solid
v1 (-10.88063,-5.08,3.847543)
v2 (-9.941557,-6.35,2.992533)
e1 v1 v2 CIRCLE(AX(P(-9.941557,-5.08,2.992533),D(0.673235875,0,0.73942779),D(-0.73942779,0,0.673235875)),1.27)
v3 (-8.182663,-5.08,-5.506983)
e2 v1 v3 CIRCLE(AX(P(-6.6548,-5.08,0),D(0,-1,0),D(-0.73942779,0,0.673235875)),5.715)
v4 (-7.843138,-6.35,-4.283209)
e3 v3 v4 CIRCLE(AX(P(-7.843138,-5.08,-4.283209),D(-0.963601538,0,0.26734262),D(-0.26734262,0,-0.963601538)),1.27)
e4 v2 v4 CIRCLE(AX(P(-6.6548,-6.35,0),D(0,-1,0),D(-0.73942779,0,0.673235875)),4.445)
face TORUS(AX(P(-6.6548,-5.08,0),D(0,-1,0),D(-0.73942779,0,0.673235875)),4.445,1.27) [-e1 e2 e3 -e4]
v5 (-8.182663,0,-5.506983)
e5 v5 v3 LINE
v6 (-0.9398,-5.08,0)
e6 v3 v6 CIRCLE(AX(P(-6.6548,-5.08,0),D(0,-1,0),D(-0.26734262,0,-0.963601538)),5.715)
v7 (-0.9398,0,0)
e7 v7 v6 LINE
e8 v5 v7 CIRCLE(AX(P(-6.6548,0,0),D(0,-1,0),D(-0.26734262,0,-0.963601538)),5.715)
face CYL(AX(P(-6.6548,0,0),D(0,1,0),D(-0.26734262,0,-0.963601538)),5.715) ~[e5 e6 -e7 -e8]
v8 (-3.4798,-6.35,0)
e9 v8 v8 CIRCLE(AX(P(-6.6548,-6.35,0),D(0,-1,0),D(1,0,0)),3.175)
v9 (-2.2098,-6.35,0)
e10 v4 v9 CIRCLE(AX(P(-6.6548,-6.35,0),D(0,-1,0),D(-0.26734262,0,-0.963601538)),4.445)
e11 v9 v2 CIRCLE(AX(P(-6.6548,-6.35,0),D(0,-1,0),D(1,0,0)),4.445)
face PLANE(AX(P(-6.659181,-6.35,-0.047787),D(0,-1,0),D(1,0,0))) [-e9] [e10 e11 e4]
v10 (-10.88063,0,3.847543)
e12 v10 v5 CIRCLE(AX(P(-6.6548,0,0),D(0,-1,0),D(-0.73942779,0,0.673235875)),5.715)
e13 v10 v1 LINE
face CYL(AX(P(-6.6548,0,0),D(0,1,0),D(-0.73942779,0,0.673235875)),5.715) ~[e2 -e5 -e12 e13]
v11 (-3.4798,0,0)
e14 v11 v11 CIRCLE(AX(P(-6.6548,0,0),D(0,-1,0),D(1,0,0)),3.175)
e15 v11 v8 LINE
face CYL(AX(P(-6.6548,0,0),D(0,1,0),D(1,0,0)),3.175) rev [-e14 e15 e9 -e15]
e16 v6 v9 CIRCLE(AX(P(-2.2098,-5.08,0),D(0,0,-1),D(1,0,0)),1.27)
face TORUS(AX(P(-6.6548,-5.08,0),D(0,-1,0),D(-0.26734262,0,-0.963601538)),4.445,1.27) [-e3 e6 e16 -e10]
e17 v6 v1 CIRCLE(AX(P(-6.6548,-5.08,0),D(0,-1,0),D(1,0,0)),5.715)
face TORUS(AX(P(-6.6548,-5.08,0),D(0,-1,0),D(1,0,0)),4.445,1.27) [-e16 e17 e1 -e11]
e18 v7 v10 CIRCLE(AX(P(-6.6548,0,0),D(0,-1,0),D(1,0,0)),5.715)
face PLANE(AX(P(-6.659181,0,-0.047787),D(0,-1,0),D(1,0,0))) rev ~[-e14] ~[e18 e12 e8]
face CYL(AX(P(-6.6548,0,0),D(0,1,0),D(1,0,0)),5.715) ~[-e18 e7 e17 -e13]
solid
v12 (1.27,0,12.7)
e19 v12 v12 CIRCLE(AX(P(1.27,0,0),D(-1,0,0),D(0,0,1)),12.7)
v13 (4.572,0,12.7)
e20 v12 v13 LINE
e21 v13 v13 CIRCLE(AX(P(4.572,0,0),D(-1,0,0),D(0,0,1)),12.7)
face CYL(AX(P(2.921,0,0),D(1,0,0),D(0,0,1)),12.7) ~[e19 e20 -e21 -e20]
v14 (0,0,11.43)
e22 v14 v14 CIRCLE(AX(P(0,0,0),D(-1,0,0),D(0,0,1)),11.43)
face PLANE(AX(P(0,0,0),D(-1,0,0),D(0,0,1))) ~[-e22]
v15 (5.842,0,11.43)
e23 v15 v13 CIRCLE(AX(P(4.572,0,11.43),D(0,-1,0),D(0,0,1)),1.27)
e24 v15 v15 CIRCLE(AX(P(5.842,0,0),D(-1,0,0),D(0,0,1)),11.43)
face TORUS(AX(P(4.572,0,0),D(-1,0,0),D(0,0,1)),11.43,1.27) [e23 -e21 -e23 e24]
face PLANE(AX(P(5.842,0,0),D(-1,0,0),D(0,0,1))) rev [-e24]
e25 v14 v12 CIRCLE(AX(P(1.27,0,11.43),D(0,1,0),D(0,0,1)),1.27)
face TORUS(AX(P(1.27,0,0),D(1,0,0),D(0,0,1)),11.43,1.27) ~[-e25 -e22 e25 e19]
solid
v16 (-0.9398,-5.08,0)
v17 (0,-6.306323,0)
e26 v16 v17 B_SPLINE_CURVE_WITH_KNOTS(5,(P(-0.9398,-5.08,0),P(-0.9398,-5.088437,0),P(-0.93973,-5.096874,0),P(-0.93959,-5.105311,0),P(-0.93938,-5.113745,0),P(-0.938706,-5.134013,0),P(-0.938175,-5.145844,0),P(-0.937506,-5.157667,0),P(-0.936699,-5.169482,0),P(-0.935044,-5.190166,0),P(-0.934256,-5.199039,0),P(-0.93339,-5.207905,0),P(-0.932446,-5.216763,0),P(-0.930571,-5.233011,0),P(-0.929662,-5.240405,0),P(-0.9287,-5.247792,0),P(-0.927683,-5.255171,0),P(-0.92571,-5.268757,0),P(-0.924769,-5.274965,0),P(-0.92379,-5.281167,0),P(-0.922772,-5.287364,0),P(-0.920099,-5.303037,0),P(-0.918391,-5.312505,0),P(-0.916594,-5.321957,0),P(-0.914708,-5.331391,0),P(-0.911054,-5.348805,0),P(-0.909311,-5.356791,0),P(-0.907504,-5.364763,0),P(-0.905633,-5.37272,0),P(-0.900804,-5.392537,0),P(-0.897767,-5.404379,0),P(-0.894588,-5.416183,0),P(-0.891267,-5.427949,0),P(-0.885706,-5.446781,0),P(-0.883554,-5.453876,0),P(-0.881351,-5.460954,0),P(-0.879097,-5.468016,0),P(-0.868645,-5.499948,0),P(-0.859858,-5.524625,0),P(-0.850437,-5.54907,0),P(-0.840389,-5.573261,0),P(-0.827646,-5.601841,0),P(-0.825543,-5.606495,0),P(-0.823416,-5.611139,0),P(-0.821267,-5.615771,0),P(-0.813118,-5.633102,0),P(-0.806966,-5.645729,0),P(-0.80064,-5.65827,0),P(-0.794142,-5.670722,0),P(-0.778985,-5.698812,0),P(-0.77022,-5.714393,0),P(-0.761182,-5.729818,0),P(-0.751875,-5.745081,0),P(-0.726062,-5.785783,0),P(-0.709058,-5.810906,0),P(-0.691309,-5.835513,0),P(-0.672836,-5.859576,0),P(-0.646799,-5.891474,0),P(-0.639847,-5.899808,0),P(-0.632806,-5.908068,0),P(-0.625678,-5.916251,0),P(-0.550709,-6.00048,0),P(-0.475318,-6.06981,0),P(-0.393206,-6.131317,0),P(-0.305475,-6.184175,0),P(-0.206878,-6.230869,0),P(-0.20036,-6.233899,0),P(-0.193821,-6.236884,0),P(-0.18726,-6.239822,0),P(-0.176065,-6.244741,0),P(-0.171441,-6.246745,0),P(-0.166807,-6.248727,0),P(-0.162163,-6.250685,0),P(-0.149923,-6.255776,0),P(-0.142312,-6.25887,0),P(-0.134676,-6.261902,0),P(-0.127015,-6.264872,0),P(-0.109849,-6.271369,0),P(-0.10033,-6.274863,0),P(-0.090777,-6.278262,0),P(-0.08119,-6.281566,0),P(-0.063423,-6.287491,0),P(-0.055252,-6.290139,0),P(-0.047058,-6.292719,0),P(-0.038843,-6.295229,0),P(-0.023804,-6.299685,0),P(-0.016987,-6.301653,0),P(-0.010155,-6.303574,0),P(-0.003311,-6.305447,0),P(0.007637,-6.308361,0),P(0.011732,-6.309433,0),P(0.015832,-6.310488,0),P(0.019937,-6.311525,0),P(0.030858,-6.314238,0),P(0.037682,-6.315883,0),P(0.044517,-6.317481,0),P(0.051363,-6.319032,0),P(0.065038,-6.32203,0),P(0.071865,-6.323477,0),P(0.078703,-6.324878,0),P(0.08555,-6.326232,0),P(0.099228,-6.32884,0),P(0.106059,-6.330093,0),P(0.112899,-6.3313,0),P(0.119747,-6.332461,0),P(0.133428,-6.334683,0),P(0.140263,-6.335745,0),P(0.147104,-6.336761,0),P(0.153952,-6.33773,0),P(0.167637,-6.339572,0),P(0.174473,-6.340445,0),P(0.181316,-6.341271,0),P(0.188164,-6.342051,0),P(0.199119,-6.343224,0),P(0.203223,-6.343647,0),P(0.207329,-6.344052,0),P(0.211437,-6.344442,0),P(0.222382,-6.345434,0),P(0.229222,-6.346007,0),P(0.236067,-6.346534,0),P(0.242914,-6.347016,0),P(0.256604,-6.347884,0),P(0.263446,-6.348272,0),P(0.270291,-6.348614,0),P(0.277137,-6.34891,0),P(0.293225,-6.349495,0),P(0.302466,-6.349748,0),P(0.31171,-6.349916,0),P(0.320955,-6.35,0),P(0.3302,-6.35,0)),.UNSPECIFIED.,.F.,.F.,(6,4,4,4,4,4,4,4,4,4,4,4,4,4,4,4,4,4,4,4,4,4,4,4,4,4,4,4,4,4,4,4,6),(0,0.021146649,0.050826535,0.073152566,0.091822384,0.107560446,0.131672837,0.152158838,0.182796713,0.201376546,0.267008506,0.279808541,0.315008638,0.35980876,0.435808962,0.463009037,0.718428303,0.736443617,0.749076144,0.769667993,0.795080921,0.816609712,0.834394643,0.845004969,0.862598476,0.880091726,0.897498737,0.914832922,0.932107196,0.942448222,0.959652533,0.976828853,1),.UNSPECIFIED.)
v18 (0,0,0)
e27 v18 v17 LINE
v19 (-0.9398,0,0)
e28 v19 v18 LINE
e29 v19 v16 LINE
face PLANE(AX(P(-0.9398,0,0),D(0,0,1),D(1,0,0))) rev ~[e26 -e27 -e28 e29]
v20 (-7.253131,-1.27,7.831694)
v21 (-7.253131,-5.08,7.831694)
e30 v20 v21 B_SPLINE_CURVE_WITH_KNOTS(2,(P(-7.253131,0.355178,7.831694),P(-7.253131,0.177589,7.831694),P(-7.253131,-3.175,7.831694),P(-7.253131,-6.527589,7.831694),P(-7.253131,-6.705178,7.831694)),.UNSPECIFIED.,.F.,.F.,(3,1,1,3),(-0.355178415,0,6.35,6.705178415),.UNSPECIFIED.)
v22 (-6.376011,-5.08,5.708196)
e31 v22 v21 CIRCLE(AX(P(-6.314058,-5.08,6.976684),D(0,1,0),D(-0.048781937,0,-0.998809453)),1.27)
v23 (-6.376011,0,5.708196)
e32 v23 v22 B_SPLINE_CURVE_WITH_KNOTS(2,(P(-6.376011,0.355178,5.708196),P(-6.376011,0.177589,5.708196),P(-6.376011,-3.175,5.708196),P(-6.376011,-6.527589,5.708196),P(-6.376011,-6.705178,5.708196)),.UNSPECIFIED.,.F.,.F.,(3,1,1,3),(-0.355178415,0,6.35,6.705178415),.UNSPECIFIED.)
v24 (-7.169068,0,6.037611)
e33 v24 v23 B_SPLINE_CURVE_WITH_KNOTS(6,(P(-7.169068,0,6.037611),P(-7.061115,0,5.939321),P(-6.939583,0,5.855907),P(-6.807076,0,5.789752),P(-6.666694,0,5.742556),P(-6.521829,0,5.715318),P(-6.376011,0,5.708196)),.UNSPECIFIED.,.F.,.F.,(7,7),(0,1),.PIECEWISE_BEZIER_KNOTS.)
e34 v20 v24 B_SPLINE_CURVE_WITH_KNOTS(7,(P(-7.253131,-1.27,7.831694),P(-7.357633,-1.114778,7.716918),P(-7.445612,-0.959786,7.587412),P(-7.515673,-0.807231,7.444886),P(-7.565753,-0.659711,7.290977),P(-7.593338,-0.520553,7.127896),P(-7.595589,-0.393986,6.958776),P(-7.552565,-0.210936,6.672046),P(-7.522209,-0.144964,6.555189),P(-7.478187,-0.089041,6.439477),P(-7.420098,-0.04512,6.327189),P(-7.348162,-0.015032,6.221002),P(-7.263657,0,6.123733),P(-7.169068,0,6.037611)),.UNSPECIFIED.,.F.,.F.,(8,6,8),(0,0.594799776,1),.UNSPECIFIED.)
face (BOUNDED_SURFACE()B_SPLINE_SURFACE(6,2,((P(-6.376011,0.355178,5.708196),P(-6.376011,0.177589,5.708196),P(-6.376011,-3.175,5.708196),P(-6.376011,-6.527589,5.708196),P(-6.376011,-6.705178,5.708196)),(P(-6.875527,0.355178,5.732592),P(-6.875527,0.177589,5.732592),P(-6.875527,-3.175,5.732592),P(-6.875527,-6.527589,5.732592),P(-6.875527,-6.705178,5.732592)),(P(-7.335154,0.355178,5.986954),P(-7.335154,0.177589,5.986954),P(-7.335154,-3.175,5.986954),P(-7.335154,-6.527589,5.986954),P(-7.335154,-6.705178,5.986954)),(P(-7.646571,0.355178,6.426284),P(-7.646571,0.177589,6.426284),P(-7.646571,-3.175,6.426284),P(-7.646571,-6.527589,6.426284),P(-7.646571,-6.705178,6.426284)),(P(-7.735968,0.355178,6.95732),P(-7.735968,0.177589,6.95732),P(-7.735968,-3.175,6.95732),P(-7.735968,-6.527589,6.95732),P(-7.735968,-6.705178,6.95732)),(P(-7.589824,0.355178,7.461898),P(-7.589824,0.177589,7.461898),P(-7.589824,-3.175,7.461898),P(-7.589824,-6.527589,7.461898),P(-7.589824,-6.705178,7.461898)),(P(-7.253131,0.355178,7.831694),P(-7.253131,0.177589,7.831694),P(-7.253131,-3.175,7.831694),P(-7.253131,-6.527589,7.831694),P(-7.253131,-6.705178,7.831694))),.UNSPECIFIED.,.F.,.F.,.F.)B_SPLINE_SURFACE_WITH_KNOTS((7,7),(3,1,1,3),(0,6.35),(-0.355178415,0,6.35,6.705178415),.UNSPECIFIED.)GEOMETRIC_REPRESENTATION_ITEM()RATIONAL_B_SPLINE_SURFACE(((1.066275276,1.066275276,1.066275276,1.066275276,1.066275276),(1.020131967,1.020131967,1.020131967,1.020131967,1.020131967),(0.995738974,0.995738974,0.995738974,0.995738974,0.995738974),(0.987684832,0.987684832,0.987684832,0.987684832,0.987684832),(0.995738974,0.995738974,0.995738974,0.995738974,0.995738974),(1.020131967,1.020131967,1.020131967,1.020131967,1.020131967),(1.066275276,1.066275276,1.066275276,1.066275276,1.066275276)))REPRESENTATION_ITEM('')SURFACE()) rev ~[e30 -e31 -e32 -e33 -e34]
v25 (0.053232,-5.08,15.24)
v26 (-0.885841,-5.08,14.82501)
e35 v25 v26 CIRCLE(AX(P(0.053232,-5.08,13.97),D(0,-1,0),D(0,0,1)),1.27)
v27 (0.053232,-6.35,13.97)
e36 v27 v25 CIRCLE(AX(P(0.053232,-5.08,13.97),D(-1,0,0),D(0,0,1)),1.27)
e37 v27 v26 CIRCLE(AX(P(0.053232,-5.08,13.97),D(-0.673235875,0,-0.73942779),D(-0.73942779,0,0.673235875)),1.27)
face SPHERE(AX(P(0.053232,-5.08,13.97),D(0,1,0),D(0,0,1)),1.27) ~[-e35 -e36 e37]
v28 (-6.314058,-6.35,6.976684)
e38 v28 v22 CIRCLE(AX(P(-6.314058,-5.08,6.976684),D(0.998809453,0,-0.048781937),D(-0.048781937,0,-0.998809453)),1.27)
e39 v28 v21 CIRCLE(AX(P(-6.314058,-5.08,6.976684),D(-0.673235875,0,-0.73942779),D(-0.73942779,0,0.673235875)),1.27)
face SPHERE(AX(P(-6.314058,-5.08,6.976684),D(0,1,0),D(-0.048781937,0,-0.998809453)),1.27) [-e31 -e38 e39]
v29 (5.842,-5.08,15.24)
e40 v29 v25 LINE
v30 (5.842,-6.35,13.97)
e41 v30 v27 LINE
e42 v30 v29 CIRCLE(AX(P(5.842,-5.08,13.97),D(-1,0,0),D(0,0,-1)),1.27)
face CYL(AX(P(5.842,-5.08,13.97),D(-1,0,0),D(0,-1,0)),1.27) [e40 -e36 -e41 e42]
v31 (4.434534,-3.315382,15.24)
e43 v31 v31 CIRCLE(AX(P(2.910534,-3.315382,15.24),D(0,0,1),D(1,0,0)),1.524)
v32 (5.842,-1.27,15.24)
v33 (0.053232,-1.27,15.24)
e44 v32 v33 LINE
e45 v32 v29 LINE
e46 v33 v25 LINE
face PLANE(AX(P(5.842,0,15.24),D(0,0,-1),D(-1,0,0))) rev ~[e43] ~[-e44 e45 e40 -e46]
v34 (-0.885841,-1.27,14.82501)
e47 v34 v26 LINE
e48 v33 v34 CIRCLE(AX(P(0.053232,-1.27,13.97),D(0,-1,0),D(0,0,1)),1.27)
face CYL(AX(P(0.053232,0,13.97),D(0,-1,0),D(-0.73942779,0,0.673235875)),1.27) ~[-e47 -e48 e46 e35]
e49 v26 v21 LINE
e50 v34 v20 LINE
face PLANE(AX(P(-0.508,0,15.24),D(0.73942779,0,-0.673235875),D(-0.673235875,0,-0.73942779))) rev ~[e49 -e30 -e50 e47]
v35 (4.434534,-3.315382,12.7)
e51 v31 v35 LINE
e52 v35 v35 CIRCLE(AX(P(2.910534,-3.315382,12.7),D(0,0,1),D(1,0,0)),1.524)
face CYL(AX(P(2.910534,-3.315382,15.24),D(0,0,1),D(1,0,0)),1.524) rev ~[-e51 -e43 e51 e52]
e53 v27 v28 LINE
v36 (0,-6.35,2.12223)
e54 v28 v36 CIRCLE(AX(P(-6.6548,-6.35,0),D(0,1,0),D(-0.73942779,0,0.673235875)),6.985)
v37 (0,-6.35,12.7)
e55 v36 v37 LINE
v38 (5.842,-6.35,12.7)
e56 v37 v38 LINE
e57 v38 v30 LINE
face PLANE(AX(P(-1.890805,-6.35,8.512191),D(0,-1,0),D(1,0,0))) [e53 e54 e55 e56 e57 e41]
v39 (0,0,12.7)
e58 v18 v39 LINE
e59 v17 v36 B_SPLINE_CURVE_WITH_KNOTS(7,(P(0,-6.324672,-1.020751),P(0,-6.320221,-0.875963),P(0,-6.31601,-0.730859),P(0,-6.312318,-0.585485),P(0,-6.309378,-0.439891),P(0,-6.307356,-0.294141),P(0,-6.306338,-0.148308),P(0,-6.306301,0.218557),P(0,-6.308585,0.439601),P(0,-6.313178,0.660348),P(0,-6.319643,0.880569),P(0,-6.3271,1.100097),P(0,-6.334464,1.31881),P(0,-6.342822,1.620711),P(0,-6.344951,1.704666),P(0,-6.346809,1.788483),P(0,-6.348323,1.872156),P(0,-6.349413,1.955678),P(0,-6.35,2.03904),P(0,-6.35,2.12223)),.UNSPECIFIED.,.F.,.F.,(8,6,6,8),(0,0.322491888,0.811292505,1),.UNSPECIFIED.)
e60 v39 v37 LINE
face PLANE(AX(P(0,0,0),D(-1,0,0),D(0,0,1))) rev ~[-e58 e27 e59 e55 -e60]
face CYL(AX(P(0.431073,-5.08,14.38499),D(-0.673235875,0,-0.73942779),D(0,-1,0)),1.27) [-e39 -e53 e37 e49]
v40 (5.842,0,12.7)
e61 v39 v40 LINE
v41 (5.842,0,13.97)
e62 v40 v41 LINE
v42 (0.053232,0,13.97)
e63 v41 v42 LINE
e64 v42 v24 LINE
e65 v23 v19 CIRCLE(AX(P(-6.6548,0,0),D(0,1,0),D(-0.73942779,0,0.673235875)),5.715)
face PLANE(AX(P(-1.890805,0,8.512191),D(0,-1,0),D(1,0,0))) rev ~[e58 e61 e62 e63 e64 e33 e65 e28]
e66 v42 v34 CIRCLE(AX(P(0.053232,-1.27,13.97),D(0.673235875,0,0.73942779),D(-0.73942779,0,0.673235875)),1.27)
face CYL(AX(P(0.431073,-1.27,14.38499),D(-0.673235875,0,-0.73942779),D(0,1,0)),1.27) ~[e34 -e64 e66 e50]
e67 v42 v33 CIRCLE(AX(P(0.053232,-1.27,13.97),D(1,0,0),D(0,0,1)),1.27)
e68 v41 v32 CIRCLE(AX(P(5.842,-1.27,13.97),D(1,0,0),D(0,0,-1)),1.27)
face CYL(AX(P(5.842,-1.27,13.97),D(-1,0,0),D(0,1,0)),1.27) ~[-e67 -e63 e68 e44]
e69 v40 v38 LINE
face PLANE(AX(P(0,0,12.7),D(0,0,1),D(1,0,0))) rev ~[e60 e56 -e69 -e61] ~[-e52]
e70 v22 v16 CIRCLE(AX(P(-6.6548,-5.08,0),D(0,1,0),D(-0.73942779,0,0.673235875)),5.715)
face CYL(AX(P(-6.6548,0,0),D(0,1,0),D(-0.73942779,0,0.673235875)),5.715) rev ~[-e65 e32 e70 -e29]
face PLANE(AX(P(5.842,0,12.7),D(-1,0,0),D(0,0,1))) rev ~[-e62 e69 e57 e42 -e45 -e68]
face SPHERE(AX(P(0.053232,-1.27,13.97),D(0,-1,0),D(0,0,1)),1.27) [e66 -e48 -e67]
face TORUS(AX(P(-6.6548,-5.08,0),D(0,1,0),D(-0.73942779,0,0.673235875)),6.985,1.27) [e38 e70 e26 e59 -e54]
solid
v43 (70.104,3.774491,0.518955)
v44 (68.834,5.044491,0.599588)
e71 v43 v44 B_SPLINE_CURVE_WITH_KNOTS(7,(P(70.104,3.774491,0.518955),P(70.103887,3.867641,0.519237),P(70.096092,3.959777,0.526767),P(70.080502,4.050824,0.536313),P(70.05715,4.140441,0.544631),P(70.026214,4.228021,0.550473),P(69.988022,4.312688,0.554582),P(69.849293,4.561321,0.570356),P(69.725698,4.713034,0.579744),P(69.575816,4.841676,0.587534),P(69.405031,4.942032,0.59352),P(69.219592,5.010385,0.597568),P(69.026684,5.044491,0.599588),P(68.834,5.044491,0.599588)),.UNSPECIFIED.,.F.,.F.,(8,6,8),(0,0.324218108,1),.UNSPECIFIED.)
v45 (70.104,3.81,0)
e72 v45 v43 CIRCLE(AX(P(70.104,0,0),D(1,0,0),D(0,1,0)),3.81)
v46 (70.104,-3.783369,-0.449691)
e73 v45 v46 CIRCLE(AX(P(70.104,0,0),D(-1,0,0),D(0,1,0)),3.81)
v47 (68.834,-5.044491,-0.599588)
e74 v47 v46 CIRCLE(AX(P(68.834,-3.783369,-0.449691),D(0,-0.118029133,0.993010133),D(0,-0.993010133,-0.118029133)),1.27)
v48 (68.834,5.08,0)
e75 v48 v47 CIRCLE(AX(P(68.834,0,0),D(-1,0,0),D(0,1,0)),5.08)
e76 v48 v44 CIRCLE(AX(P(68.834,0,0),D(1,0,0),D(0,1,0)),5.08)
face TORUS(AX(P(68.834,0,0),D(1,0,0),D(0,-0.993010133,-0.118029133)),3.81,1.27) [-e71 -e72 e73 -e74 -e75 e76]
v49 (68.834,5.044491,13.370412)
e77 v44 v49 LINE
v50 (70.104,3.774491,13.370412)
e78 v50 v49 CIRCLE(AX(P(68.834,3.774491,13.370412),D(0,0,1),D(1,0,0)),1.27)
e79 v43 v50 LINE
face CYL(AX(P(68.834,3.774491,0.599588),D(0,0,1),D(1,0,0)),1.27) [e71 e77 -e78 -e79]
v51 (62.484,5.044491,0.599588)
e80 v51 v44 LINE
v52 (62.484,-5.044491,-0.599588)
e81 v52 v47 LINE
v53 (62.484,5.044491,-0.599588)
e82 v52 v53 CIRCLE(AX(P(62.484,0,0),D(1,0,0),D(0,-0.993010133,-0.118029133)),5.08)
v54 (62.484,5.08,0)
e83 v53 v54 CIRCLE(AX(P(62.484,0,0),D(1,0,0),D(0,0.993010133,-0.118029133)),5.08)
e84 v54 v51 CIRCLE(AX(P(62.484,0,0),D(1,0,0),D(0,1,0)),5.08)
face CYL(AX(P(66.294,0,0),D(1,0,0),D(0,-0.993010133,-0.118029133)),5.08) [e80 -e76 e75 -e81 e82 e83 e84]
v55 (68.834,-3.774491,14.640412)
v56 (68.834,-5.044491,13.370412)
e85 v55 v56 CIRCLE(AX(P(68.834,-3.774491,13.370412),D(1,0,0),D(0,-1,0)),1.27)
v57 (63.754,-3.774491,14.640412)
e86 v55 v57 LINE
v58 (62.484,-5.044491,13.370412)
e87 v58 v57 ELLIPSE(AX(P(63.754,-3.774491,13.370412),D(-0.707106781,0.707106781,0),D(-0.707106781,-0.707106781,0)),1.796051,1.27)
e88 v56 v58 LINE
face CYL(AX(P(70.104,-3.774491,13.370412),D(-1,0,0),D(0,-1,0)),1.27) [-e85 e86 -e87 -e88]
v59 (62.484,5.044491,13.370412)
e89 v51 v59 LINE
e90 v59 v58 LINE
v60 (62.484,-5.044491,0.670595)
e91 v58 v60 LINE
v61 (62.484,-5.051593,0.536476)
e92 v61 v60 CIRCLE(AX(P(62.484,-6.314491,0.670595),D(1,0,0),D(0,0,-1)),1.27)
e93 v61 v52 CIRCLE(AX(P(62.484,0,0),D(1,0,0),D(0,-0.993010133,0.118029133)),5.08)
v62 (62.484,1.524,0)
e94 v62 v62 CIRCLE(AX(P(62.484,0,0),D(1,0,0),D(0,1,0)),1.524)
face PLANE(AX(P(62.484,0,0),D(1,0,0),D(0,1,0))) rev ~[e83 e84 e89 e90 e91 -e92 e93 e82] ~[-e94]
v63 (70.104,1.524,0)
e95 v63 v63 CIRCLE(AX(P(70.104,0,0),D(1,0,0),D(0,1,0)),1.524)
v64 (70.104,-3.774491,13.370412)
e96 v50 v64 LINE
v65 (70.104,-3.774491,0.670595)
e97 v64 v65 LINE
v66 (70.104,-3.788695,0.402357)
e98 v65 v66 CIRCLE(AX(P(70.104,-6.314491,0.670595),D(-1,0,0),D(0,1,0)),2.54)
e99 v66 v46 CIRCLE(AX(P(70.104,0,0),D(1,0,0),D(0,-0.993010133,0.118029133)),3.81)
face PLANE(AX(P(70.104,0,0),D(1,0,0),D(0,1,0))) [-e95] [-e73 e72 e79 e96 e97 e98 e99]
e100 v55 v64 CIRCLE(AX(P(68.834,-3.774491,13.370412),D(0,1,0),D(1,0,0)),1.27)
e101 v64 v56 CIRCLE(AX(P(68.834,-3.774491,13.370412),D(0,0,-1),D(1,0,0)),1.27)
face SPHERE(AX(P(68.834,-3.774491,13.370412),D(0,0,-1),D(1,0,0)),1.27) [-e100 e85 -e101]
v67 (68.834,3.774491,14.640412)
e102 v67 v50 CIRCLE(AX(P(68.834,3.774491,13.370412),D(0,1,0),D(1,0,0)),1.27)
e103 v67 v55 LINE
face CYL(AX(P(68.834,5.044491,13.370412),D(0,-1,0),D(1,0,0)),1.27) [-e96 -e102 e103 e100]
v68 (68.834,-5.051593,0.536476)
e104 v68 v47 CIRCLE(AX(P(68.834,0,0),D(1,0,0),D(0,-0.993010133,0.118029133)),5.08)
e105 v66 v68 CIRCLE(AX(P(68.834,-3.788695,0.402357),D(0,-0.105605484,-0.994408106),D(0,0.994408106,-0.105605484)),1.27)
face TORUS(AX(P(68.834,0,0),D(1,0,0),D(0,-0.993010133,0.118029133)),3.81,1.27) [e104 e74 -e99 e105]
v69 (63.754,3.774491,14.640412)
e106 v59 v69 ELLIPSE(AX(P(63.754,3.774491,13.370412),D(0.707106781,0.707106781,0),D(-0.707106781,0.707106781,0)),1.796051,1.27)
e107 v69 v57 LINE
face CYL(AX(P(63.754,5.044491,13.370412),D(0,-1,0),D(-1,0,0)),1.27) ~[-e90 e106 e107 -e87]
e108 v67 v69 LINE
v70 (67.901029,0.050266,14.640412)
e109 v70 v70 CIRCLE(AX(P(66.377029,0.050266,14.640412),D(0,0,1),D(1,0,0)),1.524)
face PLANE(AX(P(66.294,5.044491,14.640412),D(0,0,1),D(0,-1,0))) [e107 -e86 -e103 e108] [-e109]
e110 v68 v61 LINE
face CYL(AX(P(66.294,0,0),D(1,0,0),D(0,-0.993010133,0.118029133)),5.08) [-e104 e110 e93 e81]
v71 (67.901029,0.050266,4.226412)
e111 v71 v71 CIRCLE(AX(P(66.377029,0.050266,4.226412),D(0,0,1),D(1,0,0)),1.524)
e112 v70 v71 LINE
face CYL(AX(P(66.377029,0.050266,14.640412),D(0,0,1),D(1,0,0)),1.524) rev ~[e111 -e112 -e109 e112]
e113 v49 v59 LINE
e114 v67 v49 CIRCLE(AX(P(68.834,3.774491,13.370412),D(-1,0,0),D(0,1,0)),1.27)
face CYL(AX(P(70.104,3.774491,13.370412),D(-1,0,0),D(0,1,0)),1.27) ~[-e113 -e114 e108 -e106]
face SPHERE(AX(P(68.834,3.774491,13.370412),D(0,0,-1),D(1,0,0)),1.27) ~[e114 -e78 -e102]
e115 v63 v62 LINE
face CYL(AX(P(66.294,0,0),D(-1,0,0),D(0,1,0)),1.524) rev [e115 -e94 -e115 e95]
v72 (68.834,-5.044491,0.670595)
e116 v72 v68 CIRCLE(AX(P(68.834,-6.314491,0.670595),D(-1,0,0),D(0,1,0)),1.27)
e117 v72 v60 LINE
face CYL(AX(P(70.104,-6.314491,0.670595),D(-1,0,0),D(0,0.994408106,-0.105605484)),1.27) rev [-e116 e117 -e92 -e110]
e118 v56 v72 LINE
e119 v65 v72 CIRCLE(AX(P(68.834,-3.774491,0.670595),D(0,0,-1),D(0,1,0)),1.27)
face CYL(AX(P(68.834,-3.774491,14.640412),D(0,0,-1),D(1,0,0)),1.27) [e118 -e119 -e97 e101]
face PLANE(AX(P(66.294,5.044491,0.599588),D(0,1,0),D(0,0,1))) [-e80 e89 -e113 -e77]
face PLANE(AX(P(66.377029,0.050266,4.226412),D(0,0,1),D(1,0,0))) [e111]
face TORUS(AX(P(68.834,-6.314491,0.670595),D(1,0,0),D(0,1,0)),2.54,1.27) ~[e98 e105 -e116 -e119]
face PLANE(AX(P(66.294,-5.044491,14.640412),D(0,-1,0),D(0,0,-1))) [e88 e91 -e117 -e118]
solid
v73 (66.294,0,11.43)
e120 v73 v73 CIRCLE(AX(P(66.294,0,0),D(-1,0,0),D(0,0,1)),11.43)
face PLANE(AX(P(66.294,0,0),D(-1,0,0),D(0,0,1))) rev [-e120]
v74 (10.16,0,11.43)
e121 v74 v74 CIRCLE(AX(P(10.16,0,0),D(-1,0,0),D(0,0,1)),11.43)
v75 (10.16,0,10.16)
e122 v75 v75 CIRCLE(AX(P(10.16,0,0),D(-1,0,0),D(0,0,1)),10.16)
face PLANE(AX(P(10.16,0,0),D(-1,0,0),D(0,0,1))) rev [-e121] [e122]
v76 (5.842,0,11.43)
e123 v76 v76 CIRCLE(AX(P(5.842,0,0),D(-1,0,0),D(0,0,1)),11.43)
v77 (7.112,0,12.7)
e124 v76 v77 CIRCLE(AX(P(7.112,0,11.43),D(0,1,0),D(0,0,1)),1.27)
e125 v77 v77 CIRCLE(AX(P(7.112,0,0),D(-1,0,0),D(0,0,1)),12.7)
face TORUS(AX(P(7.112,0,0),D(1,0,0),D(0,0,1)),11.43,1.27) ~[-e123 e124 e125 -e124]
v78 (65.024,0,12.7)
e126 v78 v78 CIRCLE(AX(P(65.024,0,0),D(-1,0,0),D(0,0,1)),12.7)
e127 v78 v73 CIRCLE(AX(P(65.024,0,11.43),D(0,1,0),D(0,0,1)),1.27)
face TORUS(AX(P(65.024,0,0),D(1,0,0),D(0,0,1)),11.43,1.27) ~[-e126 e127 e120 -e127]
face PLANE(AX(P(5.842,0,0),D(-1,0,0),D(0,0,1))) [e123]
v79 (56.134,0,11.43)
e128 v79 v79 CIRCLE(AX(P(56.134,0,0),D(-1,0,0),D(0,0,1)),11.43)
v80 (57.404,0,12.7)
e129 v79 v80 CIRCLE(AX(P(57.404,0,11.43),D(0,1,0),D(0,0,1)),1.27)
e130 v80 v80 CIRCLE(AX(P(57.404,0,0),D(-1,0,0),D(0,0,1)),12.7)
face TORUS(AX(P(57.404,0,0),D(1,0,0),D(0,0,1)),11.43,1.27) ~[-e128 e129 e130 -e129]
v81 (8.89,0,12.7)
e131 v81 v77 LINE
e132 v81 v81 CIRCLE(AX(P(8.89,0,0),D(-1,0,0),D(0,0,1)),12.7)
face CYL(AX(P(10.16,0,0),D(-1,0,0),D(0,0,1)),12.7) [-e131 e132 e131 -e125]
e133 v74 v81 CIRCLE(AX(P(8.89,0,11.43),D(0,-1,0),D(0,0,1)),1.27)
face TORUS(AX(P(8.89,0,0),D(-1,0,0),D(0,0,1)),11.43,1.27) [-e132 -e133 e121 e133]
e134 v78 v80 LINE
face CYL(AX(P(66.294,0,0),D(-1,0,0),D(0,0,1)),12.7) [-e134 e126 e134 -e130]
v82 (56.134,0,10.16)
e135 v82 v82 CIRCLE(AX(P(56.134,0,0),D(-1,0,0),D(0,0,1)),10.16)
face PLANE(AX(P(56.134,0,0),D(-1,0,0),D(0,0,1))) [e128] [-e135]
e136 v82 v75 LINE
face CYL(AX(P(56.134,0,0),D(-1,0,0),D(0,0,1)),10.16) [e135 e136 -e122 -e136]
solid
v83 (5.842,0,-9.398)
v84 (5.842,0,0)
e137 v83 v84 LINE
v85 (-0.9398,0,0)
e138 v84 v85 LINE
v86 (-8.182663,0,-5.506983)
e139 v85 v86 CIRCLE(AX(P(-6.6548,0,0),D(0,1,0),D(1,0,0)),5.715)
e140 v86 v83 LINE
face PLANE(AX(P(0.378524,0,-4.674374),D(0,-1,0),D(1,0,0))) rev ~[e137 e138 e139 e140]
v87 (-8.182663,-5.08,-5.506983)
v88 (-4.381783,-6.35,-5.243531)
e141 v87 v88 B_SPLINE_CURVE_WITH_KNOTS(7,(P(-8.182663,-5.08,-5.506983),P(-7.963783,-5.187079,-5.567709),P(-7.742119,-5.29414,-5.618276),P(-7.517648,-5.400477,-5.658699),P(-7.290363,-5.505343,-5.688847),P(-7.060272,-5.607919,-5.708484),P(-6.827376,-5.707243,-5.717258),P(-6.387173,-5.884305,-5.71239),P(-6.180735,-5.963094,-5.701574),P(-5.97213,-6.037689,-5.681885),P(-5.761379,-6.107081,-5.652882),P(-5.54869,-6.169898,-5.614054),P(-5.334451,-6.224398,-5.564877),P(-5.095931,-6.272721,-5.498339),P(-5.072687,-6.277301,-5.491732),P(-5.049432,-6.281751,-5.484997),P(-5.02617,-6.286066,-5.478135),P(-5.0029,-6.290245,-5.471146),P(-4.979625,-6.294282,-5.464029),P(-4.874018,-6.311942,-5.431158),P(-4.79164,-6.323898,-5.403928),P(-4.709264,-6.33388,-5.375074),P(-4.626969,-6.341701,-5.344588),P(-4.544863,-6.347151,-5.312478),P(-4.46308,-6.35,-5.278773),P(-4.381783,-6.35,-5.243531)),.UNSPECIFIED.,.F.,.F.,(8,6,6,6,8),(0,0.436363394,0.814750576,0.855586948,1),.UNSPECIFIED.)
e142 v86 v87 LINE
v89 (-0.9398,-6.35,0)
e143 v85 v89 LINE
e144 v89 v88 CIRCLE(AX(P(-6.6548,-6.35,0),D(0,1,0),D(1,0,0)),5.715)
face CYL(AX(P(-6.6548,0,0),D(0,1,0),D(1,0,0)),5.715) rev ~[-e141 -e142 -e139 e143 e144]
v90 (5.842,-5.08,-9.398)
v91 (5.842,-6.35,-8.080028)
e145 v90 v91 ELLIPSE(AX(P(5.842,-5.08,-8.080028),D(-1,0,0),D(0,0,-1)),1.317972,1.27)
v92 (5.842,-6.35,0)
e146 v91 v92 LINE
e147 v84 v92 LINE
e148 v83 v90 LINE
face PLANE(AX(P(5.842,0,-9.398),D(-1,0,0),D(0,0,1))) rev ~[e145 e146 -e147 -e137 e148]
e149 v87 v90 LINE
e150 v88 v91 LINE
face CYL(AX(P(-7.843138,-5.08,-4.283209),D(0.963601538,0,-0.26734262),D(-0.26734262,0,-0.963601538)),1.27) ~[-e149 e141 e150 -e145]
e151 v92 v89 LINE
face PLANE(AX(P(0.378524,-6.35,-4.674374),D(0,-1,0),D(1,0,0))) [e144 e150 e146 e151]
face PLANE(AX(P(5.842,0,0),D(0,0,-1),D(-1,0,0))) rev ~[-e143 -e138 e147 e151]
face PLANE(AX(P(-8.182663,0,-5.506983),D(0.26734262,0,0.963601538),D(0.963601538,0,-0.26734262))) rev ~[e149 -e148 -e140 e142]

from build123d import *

# Parameters (mm, degrees)
F2_DEPTH  = 6.35
F0_W      = 5.842
F0_H      = 12.7
F4_DEPTH  = 6.35
F0_R      = 3.175
F5_DEPTH  = 6.35
F6_R      = 1.524
F7_DEPTH  = 3.81
F9_R      = 1.524
F10_DEPTH = 17.78
F8_R      = 1.524
F11_DEPTH = 10.414
F12_R     = 1.27
F12_2_R   = 1.27
F13_R     = 1.27
F14_R     = 1.27
F14_2_R   = 1.27
F14_3_R   = 1.27
F14_4_R   = 1.27
F14_5_R   = 1.27


with BuildPart() as f1:
    # F0 (on Front) → F1 (revolve)
    with BuildSketch(Plane.XZ):
        Polygon((5.842, 12.7), (5.842, 0), (66.294, 0), (66.294, 12.7), (56.134, 12.7), (56.134, 10.16), (10.16, 10.16), (10.16, 12.7), align=None)
    revolve(axis=Axis((33.147, 0, 0), (-1, 0, 0)))

    # F12
    f12_edges = [f1.edges().sort_by_distance(p)[0] for p in [
        (5.842, 0, -12.7),
    ]]
    fillet(f12_edges, radius=F12_R)

    # F13
    f13_edges = [f1.edges().sort_by_distance(p)[0] for p in [
        (66.294, 0, -12.7),
        (56.134, 0, -12.7),
    ]]
    fillet(f13_edges, radius=F13_R)

    # F14
    f14_edges = [f1.edges().sort_by_distance(p)[0] for p in [
        (10.16, 0, -12.7),
        (7.112, 0, -12.7),
    ]]
    fillet(f14_edges, radius=F14_R)


with BuildPart() as f2:
    # F0 (on Front) → F2 (new body)
    with BuildSketch(Plane.XZ):
        with BuildLine():
            Line((-0.9398, 0), (0, 0))
            Line((0, 0), (0, 12.7))
            Line((0, 12.7), (5.842, 12.7))
            Line((5.842, 12.7), (5.842, 15.24))
            Line((5.842, 15.24), (-0.508, 15.24))
            Line((-0.508, 15.24), (-10.8806298187, 3.8475430269))
            ThreePointArc((-10.8806298187, 3.8475430269), (-4.5919612295, 5.3297205562), (-0.9398, 0))
        make_face()
    extrude(amount=F2_DEPTH)

    # F9 (on face) → F10 (cut)
    with BuildSketch(Plane.XY.offset(15.24)):
        with Locations((2.9105336871, -3.3153819386)):
            Circle(F9_R)
    extrude(amount=-F10_DEPTH, mode=Mode.SUBTRACT)

    # F14#2
    f14_2_edges = [f2.edges().sort_by_distance(p)[0] for p in [
        (2.667, -6.35, 15.24),
        (-5.694315, 0, 9.543772),
        (-5.694315, -6.35, 9.543772),
        (-10.88063, -3.175, 3.847543),
        (-0.508, -3.175, 15.24),
        (2.667, 0, 15.24),
        (-4.591961, -6.35, 5.329721),
    ]]
    fillet(f14_2_edges, radius=F14_2_R)


with BuildPart() as f3:
    # F0 (on Front) → F3 (revolve)
    with BuildSketch(Plane.XZ):
        with Locations((2.921, 6.35)):
            Rectangle(F0_W, F0_H)
    revolve(axis=Axis((33.147, 0, 0), (-1, 0, 0)))

    # F14#3
    f14_3_edges = [f3.edges().sort_by_distance(p)[0] for p in [
        (5.842, 0, -12.7),
        (0, 0, -12.7),
    ]]
    fillet(f14_3_edges, radius=F14_3_R)


with BuildPart() as f4:
    # F0 (on Front) → F4 (new body)
    with BuildSketch(Plane.XZ):
        with BuildLine():
            Line((5.842, 0), (0, 0))
            Line((0, 0), (-0.9398, 0))
            ThreePointArc((-0.9398, 0), (-3.1957909266, -4.5493385486), (-8.1826630726, -5.5069827884))
            Line((-8.1826630726, -5.5069827884), (5.842, -9.398))
            Line((5.842, -9.398), (5.842, 0))
        make_face()
    extrude(amount=F4_DEPTH)

    # F14#4
    f14_4_edges = [f4.edges().sort_by_distance(p)[0] for p in [
        (-1.170332, -6.35, -7.452491),
    ]]
    fillet(f14_4_edges, radius=F14_4_R)


with BuildPart() as f5:
    # F0 (on Front) → F5 (new body)
    with BuildSketch(Plane.XZ):
        with BuildLine():
            ThreePointArc((-8.1826630726, -5.5069827884), (-3.1957909266, -4.5493385486), (-0.9398, 0))
            ThreePointArc((-0.9398, 0), (-4.5919612295, 5.3297205562), (-10.8806298187, 3.8475430269))
            ThreePointArc((-10.8806298187, 3.8475430269), (-12.1459778134, -1.5837270034), (-8.1826630726, -5.5069827884))
        make_face()
        with Locations((-6.6548, 0)):
            Circle(F0_R, mode=Mode.SUBTRACT)
    extrude(amount=F5_DEPTH)

    # F14#5
    f14_5_edges = [f5.edges().sort_by_distance(p)[0] for p in [
        (-2.42897, -6.35, -3.847543),
    ]]
    fillet(f14_5_edges, radius=F14_5_R)


with BuildPart() as f7:
    # F6 (on face) → F7 (new body, symmetric)
    with BuildSketch(Plane.YZ.offset(66.294)):
        with BuildLine():
            Line((-5.0444914745, 0.5995879951), (-5.0444914745, -0.5995879951))
            ThreePointArc((-5.0444914745, -0.5995879951), (0, -5.08), (5.0444914745, -0.5995879951))
            Line((5.0444914745, -0.5995879951), (5.0444914745, 0.5995879951))
            ThreePointArc((5.0444914745, 0.5995879951), (0, 5.08), (-5.0444914745, 0.5995879951))
        make_face()
        Circle(F6_R, mode=Mode.SUBTRACT)
        with BuildLine():
            ThreePointArc((-5.0444914745, 0.5995879951), (-5.08, 0), (-5.0444914745, -0.5995879951))
            Line((-5.0444914745, -0.5995879951), (-5.0444914745, 0.5995879951))
        make_face()
        with BuildLine():
            Line((5.0444914745, 0.5995879951), (5.0444914745, -0.5995879951))
            ThreePointArc((5.0444914745, -0.5995879951), (5.0711150988, -0.3003192548), (5.08, 0))
            ThreePointArc((5.08, 0), (5.0711150988, 0.3003192548), (5.0444914745, 0.5995879951))
        make_face()
        with BuildLine():
            Line((-5.0444914745, 14.6404120049), (-5.0444914745, 0.5995879951))
            ThreePointArc((-5.0444914745, 0.5995879951), (0, 5.08), (5.0444914745, 0.5995879951))
            Line((5.0444914745, 0.5995879951), (5.0444914745, 14.6404120049))
            Line((5.0444914745, 14.6404120049), (-5.0444914745, 14.6404120049))
        make_face()
    extrude(amount=F7_DEPTH, both=True)

    # F8 (on face) → F11 (cut)
    with BuildSketch(Plane.XY.offset(14.6404120049)):
        with Locations((66.3770288229, 0.0502656185)):
            Circle(F8_R)
    extrude(amount=-F11_DEPTH, mode=Mode.SUBTRACT)

    # F12#2
    f12_2_edges = [f7.edges().sort_by_distance(p)[0] for p in [
        (70.104, -5.044491, 7.62),
        (70.104, 5.044491, 7.62),
        (70.104, 0, -5.08),
        (70.104, 0, 14.640412),
        (66.294, 5.044491, 14.640412),
        (66.294, -5.044491, 14.640412),
        (62.484, 0, 14.640412),
        (66.294, -5.044491, 0.599588),
    ]]
    fillet(f12_2_edges, radius=F12_2_R)


solid = Compound([f1.part, f2.part, f3.part, f4.part, f5.part, f7.part])
